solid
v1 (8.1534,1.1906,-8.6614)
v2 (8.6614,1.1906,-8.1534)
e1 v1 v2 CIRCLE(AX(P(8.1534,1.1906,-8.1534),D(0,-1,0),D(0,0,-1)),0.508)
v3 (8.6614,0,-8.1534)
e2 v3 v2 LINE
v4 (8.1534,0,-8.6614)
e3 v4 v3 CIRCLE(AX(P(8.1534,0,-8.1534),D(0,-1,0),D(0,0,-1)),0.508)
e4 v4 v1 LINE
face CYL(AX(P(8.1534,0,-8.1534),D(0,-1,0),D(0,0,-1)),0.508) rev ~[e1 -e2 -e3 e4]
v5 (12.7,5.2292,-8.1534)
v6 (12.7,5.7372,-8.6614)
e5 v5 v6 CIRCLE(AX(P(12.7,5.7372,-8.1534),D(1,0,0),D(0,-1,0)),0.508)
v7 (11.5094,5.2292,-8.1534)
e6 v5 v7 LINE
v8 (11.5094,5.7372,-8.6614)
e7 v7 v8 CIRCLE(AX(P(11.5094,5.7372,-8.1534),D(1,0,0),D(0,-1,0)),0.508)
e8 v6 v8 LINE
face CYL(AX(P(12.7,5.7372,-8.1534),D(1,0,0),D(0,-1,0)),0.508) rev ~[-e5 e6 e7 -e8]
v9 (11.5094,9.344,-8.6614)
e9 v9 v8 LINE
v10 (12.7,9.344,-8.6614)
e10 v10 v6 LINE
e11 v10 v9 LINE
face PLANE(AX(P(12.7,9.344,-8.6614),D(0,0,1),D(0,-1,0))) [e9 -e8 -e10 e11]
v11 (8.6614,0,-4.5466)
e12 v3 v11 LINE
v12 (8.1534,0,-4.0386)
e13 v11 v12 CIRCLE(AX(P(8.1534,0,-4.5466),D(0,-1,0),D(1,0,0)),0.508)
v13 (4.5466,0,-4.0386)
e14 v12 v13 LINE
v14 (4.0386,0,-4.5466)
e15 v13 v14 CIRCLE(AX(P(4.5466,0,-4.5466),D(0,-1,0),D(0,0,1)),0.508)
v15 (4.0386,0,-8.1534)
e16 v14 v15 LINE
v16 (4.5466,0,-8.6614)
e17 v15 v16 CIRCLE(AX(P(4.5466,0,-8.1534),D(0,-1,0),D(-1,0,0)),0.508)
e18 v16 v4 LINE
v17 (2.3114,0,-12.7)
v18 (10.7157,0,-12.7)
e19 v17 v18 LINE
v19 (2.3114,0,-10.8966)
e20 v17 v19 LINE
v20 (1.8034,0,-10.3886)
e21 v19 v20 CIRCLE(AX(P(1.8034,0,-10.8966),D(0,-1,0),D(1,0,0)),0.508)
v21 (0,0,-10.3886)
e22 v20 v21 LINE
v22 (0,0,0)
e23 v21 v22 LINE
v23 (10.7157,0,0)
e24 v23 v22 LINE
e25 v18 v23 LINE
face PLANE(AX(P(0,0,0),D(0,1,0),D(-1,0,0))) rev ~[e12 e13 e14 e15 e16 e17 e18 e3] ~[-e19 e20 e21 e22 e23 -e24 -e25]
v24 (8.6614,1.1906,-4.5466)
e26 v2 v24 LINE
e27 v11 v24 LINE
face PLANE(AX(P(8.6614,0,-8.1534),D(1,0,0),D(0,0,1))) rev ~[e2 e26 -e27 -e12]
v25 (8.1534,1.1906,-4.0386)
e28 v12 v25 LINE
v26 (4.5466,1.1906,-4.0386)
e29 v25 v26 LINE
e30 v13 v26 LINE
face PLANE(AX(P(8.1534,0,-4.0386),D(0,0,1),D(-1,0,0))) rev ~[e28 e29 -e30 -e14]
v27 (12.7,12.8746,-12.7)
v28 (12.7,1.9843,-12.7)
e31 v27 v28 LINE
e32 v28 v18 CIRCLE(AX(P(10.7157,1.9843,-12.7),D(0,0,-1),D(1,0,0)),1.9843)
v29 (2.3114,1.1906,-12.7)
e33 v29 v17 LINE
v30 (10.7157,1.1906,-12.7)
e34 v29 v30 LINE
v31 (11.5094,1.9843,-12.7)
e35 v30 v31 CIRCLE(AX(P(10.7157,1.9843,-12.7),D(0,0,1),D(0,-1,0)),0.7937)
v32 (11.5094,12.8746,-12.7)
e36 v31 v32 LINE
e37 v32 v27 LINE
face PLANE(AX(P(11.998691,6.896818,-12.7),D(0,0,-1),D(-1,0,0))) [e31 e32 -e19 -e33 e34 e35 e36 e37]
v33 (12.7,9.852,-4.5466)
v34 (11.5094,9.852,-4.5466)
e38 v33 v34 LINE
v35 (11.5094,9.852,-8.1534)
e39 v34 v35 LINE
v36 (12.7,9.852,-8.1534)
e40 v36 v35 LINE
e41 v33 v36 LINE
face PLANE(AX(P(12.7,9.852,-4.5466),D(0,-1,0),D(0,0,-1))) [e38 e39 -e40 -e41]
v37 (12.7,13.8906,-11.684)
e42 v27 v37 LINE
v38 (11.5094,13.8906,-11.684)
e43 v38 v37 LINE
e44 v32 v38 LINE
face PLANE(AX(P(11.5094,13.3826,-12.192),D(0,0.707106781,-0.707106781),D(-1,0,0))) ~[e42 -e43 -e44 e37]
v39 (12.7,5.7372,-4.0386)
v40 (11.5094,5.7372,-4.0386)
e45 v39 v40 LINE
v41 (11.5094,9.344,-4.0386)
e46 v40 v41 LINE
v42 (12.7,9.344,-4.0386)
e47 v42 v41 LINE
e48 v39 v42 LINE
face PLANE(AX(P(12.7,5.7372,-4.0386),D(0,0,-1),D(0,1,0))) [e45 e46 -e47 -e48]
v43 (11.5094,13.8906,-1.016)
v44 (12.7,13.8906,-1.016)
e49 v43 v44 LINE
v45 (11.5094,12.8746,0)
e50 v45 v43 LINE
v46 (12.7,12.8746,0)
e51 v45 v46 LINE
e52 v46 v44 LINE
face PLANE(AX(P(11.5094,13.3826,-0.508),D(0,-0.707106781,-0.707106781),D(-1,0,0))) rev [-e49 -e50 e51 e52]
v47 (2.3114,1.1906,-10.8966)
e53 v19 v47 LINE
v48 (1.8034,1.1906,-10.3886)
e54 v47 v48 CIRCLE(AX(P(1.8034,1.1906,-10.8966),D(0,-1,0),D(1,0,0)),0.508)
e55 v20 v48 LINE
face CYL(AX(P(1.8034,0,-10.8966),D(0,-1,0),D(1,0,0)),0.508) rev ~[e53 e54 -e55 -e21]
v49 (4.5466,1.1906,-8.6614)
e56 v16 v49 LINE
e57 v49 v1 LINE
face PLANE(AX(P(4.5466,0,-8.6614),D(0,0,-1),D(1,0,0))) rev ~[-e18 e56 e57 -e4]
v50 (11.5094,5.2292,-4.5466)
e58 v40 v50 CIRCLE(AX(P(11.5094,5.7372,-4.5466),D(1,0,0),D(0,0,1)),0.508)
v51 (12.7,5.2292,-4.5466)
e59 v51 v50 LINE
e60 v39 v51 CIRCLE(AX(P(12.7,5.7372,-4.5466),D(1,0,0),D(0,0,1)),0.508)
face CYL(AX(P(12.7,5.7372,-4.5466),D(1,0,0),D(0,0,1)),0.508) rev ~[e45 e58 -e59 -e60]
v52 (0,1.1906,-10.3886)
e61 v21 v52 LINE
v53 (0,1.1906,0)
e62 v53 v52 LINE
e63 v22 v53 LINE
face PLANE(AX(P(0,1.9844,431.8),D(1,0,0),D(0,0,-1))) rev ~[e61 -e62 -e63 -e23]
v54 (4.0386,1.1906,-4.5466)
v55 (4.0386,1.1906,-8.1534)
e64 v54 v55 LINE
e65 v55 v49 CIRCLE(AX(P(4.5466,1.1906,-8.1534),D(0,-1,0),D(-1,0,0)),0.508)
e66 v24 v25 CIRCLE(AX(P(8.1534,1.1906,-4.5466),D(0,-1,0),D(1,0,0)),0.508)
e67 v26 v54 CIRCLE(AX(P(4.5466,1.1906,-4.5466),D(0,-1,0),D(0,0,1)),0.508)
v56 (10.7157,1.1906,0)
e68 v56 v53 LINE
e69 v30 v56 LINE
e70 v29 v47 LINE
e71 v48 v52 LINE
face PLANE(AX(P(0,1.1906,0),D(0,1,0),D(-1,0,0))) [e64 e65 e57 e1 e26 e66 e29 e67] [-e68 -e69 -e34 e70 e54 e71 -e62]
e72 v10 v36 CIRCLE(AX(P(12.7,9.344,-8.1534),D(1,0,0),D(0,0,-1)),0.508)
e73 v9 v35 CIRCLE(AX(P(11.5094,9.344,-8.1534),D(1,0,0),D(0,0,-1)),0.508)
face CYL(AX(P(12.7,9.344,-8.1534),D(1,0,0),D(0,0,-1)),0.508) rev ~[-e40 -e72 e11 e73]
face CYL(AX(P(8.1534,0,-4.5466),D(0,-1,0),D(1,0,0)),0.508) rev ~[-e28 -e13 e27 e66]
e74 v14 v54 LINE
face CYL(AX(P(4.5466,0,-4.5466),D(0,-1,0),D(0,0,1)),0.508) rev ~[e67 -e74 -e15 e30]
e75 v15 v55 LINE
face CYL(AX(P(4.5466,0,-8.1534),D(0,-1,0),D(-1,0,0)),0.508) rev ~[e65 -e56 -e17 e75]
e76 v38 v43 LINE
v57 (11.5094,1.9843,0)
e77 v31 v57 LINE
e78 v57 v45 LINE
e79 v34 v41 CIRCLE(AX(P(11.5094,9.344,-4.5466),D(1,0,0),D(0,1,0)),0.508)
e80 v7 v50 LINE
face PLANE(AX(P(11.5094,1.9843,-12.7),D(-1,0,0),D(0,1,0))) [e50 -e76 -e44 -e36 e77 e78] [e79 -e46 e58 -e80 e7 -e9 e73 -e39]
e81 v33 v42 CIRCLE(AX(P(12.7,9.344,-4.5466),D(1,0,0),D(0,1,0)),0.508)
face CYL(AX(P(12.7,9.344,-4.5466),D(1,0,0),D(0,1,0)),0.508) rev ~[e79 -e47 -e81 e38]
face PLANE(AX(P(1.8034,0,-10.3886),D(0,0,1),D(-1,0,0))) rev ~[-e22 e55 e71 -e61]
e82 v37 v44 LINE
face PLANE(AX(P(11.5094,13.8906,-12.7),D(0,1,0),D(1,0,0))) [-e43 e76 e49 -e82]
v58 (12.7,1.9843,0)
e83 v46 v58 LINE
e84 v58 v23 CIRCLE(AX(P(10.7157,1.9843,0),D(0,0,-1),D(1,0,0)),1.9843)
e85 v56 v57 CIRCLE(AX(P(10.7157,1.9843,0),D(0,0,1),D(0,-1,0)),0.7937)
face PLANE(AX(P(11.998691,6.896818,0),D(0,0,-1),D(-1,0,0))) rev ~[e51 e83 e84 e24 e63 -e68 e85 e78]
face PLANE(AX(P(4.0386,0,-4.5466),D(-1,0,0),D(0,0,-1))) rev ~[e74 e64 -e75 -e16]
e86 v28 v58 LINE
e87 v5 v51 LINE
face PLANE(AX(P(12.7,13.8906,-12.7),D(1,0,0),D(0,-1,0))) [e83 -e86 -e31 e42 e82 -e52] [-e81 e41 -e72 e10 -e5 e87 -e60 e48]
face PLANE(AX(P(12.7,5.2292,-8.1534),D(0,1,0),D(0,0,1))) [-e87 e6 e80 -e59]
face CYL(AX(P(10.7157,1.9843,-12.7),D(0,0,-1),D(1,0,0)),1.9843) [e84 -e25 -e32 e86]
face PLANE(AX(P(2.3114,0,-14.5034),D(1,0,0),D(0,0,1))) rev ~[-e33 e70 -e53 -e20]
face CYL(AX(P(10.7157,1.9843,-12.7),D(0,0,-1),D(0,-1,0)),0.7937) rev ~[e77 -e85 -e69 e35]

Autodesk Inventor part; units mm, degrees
ref_plane "YZ Plane" through (0, 0, 0) normal (1, 0, 0) x (0, 1, 0)
ref_plane "XZ Plane" through (0, 0, 0) normal (0, 1, 0) x (-1, 0, 0)
sketch "Sketch1" plane through (0, 0, 0) normal (0, 1, 0) x (-1, 0, 0)
  line L0 (-12.7, 0) -> (12.7, 0)
  line L1 (12.7, 0) -> (12.7, -12.7)
  line L2 (12.7, -12.7) -> (-12.7, -12.7)
  line L3 (-12.7, -12.7) -> (-12.7, 0)
  line L4 (12.7, 0) -> (-12.7, -12.7) construction
  point P0 (0, 0)
  point P1 (0, 0)
  dimension "d0" = 25.4
  dimension "d1" = 12.7
extrude "Plate1" add sketch "Sketch1" along normal blind 1.1906
sketch "Sketch2" plane through (11.5094, 0, -12.7) normal (1, 0, 0) x (0, 1, 0)
  line L0 (0, 12.7) -> (0, 0)
  line L1 (0, 0) -> (13.8906, 0)
  line L2 (13.8906, 0) -> (13.8906, 12.7)
  line L3 (13.8906, 12.7) -> (0, 12.7)
edge flange "Flanges" height 12.7 angle 90 thickness 1.1906 bend radius 0.7937 thickness toward (1, 0, 0) relief tear relief width 1.1906 relief depth 0.5953 corner gap 1.1906 corner form 0 edges at (12.7, 1.1906, -6.35) (-12.7, 1.1906, -6.35) wall of the first edge with corners at (11.5094, 0, 0) (11.5094, 0, -12.7) (11.5094, 13.8906, -12.7) (11.5094, 13.8906, 0)
bend "Bend1"
corner "Corner1"
sketch "Sketch3" plane through (12.7, 1.9844, -12.7) normal (1, 0, 0) x (0, 0, -1)
  line L0 (-8.1534, 7.8676) -> (-4.5466, 7.8676)
  line L1 (-4.0386, 7.3596) -> (-4.0386, 3.7528)
  line L2 (-4.5466, 3.2448) -> (-8.1534, 3.2448)
  line L3 (-8.6614, 3.7528) -> (-8.6614, 7.3596)
  arc A0 (-8.1534, 7.8676) -> (-8.6614, 7.3596) centre (-8.1534, 7.3596) ccw
  arc A1 (-4.0386, 7.3596) -> (-4.5466, 7.8676) centre (-4.5466, 7.3596) ccw
  arc A2 (-4.5466, 3.2448) -> (-4.0386, 3.7528) centre (-4.5466, 3.7528) ccw
  arc A3 (-8.6614, 3.7528) -> (-8.1534, 3.2448) centre (-8.1534, 3.7528) ccw
  line L4 (-12.7, 0) -> (-12.7, 11.9063) construction
  line L5 (-12.7, 11.9063) -> (0, 11.9063) construction
  line L6 (-8.1534, 7.3596) -> (-4.5466, 3.7528) construction
  point P0 (-12.7, -1.9844)
  point P1 (-4.0386, 3.2448)
  point P2 (-8.6614, 3.2448)
  point P3 (-6.35, 5.5562)
  dimension "d16" = 4.6228
  dimension "d17" = 0.508
  dimension "d20" = 6.35
  dimension "d21" = 6.35
extrude "Flange Stamp" cut sketch "Sketch3" against normal blind 1.1906
sketch "Sketch7" plane through (12.7, 1.9844, 0) normal (1, 0, 0) x (0, 0, -1)
  arc A0 (4.5466, 7.8676) -> (4.0386, 7.3596) centre (4.5466, 7.3596) ccw construction
  arc A1 (8.1534, 3.2448) -> (8.6614, 3.7528) centre (8.1534, 3.7528) ccw construction
  circle A2 centre (6.35, 5.5563) radius 2.1844
  line L0 (4.5466, 7.3596) -> (8.1534, 3.7528) construction
  point P0 (0, -1.9844)
  dimension "d46" = 4.3688
surface extrude "Flange Circle" sketch "Sketch7" against normal up to surface (1.1906 mm away) shown yes curves A2
ref_plane "Flange Pattern Plane" through (12.7, 7.5406, -4.5466) normal (0, 1, 0) x (1, 0, 0)
sketch "Flange Pattern Sketch" plane through (12.7, 7.5406, -4.5466) normal (0, 1, 0) x (1, 0, 0)
  line L0 (0, 3.6068) -> (0, 0) construction
  line L1 (-30.5622, -4.5466) -> (5.5732, -4.5466) construction
  line L2 (0, 0) -> (-1.1906, 0) construction
  point P0 (-12.7, -4.5466)
  point P1 (0, 1.8034)
  point P2 (0, 14.5034)
  dimension "d43" = 25.4
  dimension "d40" = 12.7
feature "Flange Pattern" [suppressed]
sketch "Sketch8" plane through (0, 0, 0) normal (0, -1, 0) x (1, 0, 0)
  line L0 (10.7156, 0) -> (-10.7156, 0) construction
  line L1 (8.1534, -4.0386) -> (4.5466, -4.0386)
  line L2 (4.0386, -4.5466) -> (4.0386, -8.1534)
  line L3 (4.5466, -8.6614) -> (8.1534, -8.6614)
  line L4 (8.6614, -8.1534) -> (8.6614, -4.5466)
  arc A0 (8.6614, -4.5466) -> (8.1534, -4.0386) centre (8.1534, -4.5466) ccw
  arc A1 (8.1534, -8.6614) -> (8.6614, -8.1534) centre (8.1534, -8.1534) ccw
  arc A2 (4.0386, -8.1534) -> (4.5466, -8.6614) centre (4.5466, -8.1534) ccw
  arc A3 (4.5466, -4.0386) -> (4.0386, -4.5466) centre (4.5466, -4.5466) ccw
  line L5 (8.1534, -4.5466) -> (4.5466, -8.1534) construction
  line L6 (12.7, 0) -> (12.7, -12.7) construction
  point P0 (0, 0)
  point P1 (4.0386, -8.6614)
  point P2 (8.6614, -8.6614)
  point P3 (6.35, -6.35)
  dimension "d49" = 4.6228
  dimension "d50" = 0.508
  dimension "d51" = 6.35
  dimension "d52" = 6.35
extrude "Body Stamp" cut sketch "Sketch8" against normal blind 1.1906
sketch "Sketch9" plane through (0, 0, 0) normal (0, -1, 0) x (1, 0, 0)
  arc A0 (8.6614, -4.5466) -> (8.1534, -4.0386) centre (8.1534, -4.5466) ccw construction
  arc A1 (4.0386, -8.1534) -> (4.5466, -8.6614) centre (4.5466, -8.1534) ccw construction
  line L0 (8.1534, -4.5466) -> (4.5466, -8.1534) construction
  circle A2 centre (6.35, -6.35) radius 2.1844
  point P0 (0, 0)
  dimension "d55" = 4.3688
surface extrude "Body Circle" sketch "Sketch9" against normal up to surface (1.1906 mm away) shown yes curves A2
sketch "Body Pattern Sketch" plane through (0, 0, 0) normal (0, -1, 0) x (1, 0, 0)
  line L0 (10.7156, 0) -> (-10.7156, 0) construction
  line L1 (12.7, 0) -> (12.7, -12.7) construction
  point P0 (0, 0)
  point P1 (6.35, -6.35)
  point P2 (6.35, -19.05)
  dimension "d62" = 12.7
  dimension "d65" = 12.7
  dimension "d58" = 6.35
  dimension "d99" = 6.35
feature "Body Pattern" [suppressed]
sketch "Sketch15" plane through (0, 0, 0) normal (0, -1, 0) x (1, 0, 0)
  line L0 (10.7156, 0) -> (-10.7156, 0) construction
  line L1 (1.8034, -10.3886) -> (-1.8034, -10.3886)
  line L2 (-2.3114, -10.8966) -> (-2.3114, -14.5034)
  line L3 (-1.8034, -15.0114) -> (1.8034, -15.0114)
  line L4 (2.3114, -14.5034) -> (2.3114, -10.8966)
  arc A0 (2.3114, -10.8966) -> (1.8034, -10.3886) centre (1.8034, -10.8966) ccw
  arc A1 (1.8034, -15.0114) -> (2.3114, -14.5034) centre (1.8034, -14.5034) ccw
  arc A2 (-1.8034, -10.3886) -> (-2.3114, -10.8966) centre (-1.8034, -10.8966) ccw
  arc A3 (-2.3114, -14.5034) -> (-1.8034, -15.0114) centre (-1.8034, -14.5034) ccw
  line L5 (1.8034, -10.8966) -> (-1.8034, -14.5034) construction
  line L6 (12.7, 0) -> (12.7, -12.7) construction
  point P0 (0, 0)
  point P1 (-2.3114, -15.0114)
  point P2 (2.3114, -15.0114)
  point P3 (0, -12.7)
  dimension "d106" = 4.6228
  dimension "d107" = 0.508
  dimension "d108" = 12.7
  dimension "d109" = 12.7
extrude "Center Stamp" cut sketch "Sketch15" against normal blind 1.1906
sketch "Sketch16" plane through (0, 0, 0) normal (0, -1, 0) x (1, 0, 0)
  circle A0 centre (0, -12.7) radius 2.1844
  line L0 (10.7156, 0) -> (-10.7156, 0) construction
  line L1 (12.7, 0) -> (12.7, -12.7) construction
  point P0 (0, 0)
  dimension "d112" = 4.3688
  dimension "d118" = 12.7
  dimension "d119" = 12.7
extrude_surface "Center Circle" [suppressed]
pattern_linear "Center Pattern" [suppressed]
sketch "Arc Length" plane through (11.5094, 1.9844, 0) normal (0, 0, 1) x (1, 0, 0)
  line L0 (0, 0) -> (1.1906, 0) construction
  arc A0 (-0.7937, -0.7938) -> (0, 0) centre (-0.7938, 0) ccw construction
  line L1 (-0.7937, -1.9844) -> (-0.7937, -0.7938) construction
  arc A1 (-0.7937, -1.9844) -> (1.1906, 0) centre (-0.7937, 0) ccw construction
  point P0 (-11.5094, -1.9844)
  dimension "d85" = 3.117
  dimension "d92" = 1.2468
sketch "Sketch13" plane through (12.7, 13.8906, 0) normal (1, 0, 0) x (0, 0, -1)
  line L0 (0, 0) -> (12.7, 0) construction
  line L1 (62.4078, 0) -> (63.4238, -1.016)
  line L2 (63.4238, -1.016) -> (64.4398, 0)
  line L3 (62.4078, 0) -> (64.4398, 0)
  line L4 (12.7, -11.9063) -> (0, -11.9063) construction
  line L5 (63.4238, -10.8903) -> (61.3168, -12.9972)
  line L6 (61.3168, -12.9972) -> (63.4238, -15.1042)
  line L7 (63.4238, -15.1042) -> (65.5308, -12.9972)
  line L8 (65.5308, -12.9972) -> (63.4238, -10.8903)
  line L9 (63.4238, -10.8903) -> (63.4238, -15.1042) construction
  line L10 (63.4238, -1.016) -> (63.4238, -10.8903) construction
  line L11 (0, -11.9063) -> (12.7, -11.9063) construction
  point P0 (0, -13.8906)
  dimension "d86" = 4.2139
  dimension "d88" = 1.016
  dimension "d91" = 1.016
  dimension "d102" = 63.4238
feature "Notch" [suppressed]
mirror "Notch Mirror" [suppressed]
pattern_linear "Notch Pattern" [suppressed]
chamfer "End Chamfer" distance 1.016 angle 45 4 edges at (-12.1047, 13.8906, -12.7) (12.1047, 13.8906, -12.7) (-12.1047, 13.8906, 0) (12.1047, 13.8906, 0)
sketch "Sketch14" plane through (-12.7, 1.9844, 431.8) normal (1, 0, 0) x (0, 0, -1)
  line L0 (431.8, 11.9063) -> (444.5, 11.9063) construction
  line L1 (431.8, 0) -> (431.8, 11.9063) construction
  line L2 (431.8, -1.9844) -> (444.5, -1.9844) construction
  line L3 (431.8, 11.9063) -> (444.5, 11.9063)
  line L4 (444.5, 11.9063) -> (444.5, -1.9844)
  line L5 (444.5, -1.9844) -> (431.8, -1.9844)
  line L6 (431.8, -1.9844) -> (431.8, 11.9063)
  point P0 (62.4078, 11.9062)
  point P1 (432.816, 11.9063)
  point P2 (431.8, 10.8903)
  point P3 (382.0521, -1.9844)
  point P4 (443.484, 11.9063)
  point P5 (254.9398, 11.9062)
  point P6 (316.4078, 11.9062)
extrude "Half Cut" cut sketch "Sketch14" along normal blind 12.7
equation "\"d1\" = 12.7 * Length"
equation "\"d18\" = Thickness"
equation "\"d53\" = Thickness"
equation "\"d89\" = Thickness"
equation "\"d2\" = Thickness"
equation "\"d3\" = BendReliefWidth"
equation "\"d4\" = BendReliefDepth"
equation "\"d5\" = MinimumRemnant"
equation "\"d6\" = TransitionRadius"
equation "\"d10\" = CornerReliefSize"
equation "\"d11\" = GapSize"
equation "\"d12\" = JacobiRadiusSize"
equation "\"BendRadius\" = Thickness"
equation "\"BendReliefWidth\" = Thickness"
equation "\"BendReliefDepth\" = 0.5 * Thickness"
equation "\"CornerReliefSize\" = 4 * Thickness"
equation "\"MinimumRemnant\" = 2 * Thickness"
equation "\"TransitionRadius\" = BendRadius"
equation "\"JacobiRadiusSize\" = BendRadius"
equation "\"GapSize\" = Thickness"
equation "\"Length\" = 1"
equation "\"Thickness\" = 1.190625"
properties part number "Alu C 1x2x1x35"
